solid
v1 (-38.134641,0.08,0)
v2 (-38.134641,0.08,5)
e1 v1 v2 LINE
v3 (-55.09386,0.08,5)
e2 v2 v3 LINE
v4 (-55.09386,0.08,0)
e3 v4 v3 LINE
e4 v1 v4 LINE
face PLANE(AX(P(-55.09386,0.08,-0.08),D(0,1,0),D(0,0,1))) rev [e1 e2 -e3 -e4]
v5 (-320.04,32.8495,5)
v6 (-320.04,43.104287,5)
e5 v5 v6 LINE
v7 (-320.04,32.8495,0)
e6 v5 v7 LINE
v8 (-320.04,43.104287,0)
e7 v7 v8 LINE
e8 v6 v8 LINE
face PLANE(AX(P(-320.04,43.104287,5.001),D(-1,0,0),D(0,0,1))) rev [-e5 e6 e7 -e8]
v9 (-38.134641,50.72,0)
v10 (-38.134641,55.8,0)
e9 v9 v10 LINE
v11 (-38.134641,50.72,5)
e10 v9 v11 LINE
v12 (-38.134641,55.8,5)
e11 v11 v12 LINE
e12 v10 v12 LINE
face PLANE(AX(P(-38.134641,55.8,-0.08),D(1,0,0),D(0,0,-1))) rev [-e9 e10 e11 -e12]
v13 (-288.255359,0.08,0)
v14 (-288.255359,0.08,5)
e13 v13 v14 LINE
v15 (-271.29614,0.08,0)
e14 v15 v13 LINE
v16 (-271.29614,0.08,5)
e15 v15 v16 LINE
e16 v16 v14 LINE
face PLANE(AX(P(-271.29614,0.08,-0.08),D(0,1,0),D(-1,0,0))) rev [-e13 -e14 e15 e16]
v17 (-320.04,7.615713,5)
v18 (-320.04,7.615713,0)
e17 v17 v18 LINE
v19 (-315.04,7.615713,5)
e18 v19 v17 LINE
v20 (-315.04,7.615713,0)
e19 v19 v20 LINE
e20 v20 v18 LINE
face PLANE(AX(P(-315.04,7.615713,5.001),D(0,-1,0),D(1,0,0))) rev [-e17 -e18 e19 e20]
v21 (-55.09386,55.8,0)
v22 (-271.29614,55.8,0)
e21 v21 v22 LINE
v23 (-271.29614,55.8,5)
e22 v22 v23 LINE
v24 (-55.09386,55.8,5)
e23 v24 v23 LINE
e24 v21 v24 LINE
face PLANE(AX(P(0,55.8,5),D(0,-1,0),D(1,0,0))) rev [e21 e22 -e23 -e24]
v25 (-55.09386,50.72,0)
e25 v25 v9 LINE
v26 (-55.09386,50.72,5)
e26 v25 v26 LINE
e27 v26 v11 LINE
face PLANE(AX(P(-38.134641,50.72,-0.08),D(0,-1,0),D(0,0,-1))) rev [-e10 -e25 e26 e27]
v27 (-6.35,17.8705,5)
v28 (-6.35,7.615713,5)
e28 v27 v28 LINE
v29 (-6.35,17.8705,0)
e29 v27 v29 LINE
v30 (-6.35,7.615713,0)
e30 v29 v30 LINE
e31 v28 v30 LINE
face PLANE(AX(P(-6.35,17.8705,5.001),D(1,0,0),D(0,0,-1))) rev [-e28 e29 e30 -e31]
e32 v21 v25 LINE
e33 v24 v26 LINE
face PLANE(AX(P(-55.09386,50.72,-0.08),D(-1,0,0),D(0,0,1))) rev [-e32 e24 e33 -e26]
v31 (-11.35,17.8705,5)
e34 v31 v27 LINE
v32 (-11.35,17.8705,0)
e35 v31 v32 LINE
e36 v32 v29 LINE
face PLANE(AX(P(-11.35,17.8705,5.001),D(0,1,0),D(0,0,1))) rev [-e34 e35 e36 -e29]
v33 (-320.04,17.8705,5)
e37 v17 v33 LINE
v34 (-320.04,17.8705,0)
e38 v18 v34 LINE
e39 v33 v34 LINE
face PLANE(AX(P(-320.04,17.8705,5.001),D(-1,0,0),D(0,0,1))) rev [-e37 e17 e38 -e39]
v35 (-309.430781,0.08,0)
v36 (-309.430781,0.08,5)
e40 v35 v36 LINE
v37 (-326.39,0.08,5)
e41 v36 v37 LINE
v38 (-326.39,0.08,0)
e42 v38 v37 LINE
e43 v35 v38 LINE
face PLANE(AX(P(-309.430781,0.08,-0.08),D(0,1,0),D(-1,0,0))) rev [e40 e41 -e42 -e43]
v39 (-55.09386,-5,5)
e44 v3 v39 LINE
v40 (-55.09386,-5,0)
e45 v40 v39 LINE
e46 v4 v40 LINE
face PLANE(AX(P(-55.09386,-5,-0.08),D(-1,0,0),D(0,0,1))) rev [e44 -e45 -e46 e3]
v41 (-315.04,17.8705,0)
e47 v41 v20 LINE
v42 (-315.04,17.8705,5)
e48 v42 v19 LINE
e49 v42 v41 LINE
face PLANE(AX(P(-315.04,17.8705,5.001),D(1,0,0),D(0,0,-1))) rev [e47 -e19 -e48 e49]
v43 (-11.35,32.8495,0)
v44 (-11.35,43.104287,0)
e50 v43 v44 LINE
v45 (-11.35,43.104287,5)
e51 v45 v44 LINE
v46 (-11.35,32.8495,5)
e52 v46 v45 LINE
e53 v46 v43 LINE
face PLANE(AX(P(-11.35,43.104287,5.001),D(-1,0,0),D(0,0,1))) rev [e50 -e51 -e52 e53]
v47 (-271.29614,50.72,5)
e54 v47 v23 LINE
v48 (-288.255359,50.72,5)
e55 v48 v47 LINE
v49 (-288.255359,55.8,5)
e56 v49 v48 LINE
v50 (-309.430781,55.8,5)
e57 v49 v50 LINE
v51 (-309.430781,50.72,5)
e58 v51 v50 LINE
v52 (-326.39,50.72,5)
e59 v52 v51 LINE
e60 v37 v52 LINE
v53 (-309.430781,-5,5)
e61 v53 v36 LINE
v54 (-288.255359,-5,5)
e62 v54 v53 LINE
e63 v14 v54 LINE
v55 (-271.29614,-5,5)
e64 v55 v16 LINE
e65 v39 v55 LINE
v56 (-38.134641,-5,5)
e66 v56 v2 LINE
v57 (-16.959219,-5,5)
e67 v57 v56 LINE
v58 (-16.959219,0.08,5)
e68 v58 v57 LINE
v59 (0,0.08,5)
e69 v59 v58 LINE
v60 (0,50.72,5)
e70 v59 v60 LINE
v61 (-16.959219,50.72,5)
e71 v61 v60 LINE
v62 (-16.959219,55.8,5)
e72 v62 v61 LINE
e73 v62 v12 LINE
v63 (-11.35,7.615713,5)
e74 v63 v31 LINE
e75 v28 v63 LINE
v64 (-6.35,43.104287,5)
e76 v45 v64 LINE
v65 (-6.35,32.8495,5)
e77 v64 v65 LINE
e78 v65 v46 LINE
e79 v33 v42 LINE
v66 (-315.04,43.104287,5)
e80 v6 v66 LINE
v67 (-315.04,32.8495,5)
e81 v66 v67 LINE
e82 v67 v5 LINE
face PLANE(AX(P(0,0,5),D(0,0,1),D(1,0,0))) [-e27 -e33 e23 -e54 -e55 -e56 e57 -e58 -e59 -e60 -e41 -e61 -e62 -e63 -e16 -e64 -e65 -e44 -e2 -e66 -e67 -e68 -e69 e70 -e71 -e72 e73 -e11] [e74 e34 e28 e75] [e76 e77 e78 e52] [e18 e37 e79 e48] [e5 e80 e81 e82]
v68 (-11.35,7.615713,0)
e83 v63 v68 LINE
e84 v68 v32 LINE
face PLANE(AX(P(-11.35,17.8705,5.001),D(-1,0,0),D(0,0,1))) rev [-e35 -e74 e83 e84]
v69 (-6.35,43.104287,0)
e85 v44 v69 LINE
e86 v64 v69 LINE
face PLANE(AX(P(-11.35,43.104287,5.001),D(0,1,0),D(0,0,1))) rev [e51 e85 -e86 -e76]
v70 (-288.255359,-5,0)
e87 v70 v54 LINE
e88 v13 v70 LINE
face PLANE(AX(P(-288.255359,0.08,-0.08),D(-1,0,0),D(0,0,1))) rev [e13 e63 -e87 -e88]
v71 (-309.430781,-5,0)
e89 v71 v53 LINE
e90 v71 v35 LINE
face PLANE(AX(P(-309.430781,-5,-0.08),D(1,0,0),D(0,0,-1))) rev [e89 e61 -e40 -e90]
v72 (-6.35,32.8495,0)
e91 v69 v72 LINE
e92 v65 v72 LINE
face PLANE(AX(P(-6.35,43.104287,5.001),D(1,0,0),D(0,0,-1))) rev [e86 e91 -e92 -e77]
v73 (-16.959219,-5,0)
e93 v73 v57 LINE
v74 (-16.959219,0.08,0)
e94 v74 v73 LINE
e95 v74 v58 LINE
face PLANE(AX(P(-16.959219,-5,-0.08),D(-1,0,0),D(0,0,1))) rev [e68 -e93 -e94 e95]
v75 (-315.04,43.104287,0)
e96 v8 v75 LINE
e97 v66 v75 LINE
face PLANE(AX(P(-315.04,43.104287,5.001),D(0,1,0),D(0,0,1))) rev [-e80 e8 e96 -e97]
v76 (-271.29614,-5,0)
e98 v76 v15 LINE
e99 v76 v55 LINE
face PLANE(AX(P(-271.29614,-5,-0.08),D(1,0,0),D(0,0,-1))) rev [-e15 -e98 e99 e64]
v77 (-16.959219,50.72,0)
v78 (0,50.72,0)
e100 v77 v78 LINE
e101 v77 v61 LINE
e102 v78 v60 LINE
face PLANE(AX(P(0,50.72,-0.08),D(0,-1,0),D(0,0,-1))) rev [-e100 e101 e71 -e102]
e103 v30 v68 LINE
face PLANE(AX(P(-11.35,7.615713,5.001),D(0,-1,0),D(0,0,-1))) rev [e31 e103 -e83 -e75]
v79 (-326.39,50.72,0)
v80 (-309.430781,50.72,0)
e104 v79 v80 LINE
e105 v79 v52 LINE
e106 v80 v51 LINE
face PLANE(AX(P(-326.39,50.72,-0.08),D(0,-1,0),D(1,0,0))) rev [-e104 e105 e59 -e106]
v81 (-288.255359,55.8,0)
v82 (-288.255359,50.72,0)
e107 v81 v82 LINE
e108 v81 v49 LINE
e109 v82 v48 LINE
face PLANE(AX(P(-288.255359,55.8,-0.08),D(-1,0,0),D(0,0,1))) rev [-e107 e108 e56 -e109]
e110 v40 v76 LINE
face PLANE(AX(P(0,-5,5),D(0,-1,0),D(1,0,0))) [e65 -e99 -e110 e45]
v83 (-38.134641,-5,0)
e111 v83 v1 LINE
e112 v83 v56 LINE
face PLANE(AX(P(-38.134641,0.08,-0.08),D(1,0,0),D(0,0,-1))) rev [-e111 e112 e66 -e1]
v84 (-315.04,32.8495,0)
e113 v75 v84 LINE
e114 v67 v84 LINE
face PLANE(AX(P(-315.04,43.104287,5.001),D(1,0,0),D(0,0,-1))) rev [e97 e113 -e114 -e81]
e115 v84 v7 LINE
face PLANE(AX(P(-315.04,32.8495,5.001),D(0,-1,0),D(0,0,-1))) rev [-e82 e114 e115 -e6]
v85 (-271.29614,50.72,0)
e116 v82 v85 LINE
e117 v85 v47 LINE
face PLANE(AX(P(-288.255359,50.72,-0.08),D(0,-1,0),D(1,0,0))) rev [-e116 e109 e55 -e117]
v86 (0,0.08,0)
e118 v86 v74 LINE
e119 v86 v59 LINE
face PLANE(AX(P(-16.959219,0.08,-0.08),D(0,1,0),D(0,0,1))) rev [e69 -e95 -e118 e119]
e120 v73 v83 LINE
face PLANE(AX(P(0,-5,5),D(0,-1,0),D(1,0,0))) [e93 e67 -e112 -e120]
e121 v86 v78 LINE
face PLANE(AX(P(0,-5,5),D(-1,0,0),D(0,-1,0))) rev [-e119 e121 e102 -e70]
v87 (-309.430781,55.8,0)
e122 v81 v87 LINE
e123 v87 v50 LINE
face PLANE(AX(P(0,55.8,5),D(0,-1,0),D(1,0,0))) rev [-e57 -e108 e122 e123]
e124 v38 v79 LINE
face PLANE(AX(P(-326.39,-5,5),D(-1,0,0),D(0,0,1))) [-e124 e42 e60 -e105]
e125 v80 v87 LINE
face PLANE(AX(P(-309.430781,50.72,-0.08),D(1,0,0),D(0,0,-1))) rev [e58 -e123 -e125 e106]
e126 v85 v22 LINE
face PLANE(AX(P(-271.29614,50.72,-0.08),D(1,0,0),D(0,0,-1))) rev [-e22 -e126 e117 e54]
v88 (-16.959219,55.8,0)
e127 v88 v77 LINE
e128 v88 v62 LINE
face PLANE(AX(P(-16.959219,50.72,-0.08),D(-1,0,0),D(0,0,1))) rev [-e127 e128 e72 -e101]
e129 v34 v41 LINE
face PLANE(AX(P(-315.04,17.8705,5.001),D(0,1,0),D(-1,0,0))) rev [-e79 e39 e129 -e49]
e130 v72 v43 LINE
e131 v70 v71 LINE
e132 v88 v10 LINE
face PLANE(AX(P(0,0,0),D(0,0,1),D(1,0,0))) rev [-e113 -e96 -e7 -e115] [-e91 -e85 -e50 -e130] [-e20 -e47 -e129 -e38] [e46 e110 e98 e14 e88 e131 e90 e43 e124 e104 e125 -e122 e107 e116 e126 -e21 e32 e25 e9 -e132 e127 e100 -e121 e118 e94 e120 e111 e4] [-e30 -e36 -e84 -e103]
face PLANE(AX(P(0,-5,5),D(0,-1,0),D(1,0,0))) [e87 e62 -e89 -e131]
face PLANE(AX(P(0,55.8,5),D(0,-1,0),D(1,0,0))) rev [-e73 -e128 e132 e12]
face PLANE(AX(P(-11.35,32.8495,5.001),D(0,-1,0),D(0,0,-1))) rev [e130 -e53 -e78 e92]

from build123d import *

# Parameters (mm, degrees)
SKETCH1_W           = 326.39
SKETCH1_H           = 60.799999812
BOSS_EXTRUDE1_DEPTH = 5
SKETCH9_W           = 16.959219297
SKETCH9_H           = 5.08
CUT_EXTRUDE2_DEPTH  = 5.08
CUT_EXTRUDE3_REACH  = 333.163
SKETCH11_W          = 5
SKETCH11_H          = 10.254787301


with BuildPart() as part:
    # Sketch1 → Boss-Extrude1 (new body)
    with BuildSketch(Plane.XY):
        with Locations((-163.195, 25.4)):
            Rectangle(SKETCH1_W, SKETCH1_H)
    extrude(amount=BOSS_EXTRUDE1_DEPTH)

    # Sketch9 → Cut-Extrude2 (cut)
    with BuildSketch(Plane.XY.offset(4.999999906)):
        with Locations((-46.614250443, -2.459999906)):
            Rectangle(SKETCH9_W, SKETCH9_H)
        with Locations((-8.479609649, -2.459999906)):
            Rectangle(SKETCH9_W, SKETCH9_H)
        with Locations((-8.479609649, 53.259999906)):
            Rectangle(SKETCH9_W, SKETCH9_H)
        with Locations((-46.614250443, 53.259999906)):
            Rectangle(SKETCH9_W, SKETCH9_H)
        with Locations((-279.775749558, 53.259999906)):
            Rectangle(SKETCH9_W, SKETCH9_H)
        with Locations((-317.910390352, 53.259999906)):
            Rectangle(SKETCH9_W, SKETCH9_H)
        with Locations((-317.910390352, -2.459999906)):
            Rectangle(SKETCH9_W, SKETCH9_H)
        with Locations((-279.775749558, -2.459999906)):
            Rectangle(SKETCH9_W, SKETCH9_H)
    extrude(amount=-CUT_EXTRUDE2_DEPTH, mode=Mode.SUBTRACT)

    # Sketch11 → Cut-Extrude3 (cut, up to next)
    with BuildSketch(Plane(origin=(0, 0, 0), x_dir=(-1, 0, 0), z_dir=(0, 0, -1)), mode=Mode.PRIVATE) as cut_extrude3_sk1:
        with Locations((8.85, 37.976893645)):
            Rectangle(SKETCH11_W, SKETCH11_H)
    cut_extrude3_tool1 = extrude(cut_extrude3_sk1.sketch, amount=-CUT_EXTRUDE3_REACH, mode=Mode.PRIVATE) & part.part
    # Sketch11 → Cut-Extrude3 (cut, up to next)
    with BuildSketch(Plane(origin=(0, 0, 0), x_dir=(-1, 0, 0), z_dir=(0, 0, -1)), mode=Mode.PRIVATE) as cut_extrude3_sk2:
        with Locations((8.85, 12.743106261)):
            Rectangle(SKETCH11_W, SKETCH11_H)
    cut_extrude3_tool2 = extrude(cut_extrude3_sk2.sketch, amount=-CUT_EXTRUDE3_REACH, mode=Mode.PRIVATE) & part.part
    # Sketch11 → Cut-Extrude3 (cut, up to next)
    with BuildSketch(Plane(origin=(0, 0, 0), x_dir=(-1, 0, 0), z_dir=(0, 0, -1)), mode=Mode.PRIVATE) as cut_extrude3_sk3:
        with Locations((317.54, 12.743106261)):
            Rectangle(SKETCH11_W, SKETCH11_H)
    cut_extrude3_tool3 = extrude(cut_extrude3_sk3.sketch, amount=-CUT_EXTRUDE3_REACH, mode=Mode.PRIVATE) & part.part
    # Sketch11 → Cut-Extrude3 (cut, up to next)
    with BuildSketch(Plane(origin=(0, 0, 0), x_dir=(-1, 0, 0), z_dir=(0, 0, -1)), mode=Mode.PRIVATE) as cut_extrude3_sk4:
        with Locations((317.54, 37.976893645)):
            Rectangle(SKETCH11_W, SKETCH11_H)
    cut_extrude3_tool4 = extrude(cut_extrude3_sk4.sketch, amount=-CUT_EXTRUDE3_REACH, mode=Mode.PRIVATE) & part.part
    add(cut_extrude3_tool1.solids().sort_by_distance((-8.85, 37.976894, 0))[0], mode=Mode.SUBTRACT)
    add(cut_extrude3_tool2.solids().sort_by_distance((-8.85, 12.743106, 0))[0], mode=Mode.SUBTRACT)
    add(cut_extrude3_tool3.solids().sort_by_distance((-317.54, 12.743106, 0))[0], mode=Mode.SUBTRACT)
    add(cut_extrude3_tool4.solids().sort_by_distance((-317.54, 37.976894, 0))[0], mode=Mode.SUBTRACT)


solid = part.part
